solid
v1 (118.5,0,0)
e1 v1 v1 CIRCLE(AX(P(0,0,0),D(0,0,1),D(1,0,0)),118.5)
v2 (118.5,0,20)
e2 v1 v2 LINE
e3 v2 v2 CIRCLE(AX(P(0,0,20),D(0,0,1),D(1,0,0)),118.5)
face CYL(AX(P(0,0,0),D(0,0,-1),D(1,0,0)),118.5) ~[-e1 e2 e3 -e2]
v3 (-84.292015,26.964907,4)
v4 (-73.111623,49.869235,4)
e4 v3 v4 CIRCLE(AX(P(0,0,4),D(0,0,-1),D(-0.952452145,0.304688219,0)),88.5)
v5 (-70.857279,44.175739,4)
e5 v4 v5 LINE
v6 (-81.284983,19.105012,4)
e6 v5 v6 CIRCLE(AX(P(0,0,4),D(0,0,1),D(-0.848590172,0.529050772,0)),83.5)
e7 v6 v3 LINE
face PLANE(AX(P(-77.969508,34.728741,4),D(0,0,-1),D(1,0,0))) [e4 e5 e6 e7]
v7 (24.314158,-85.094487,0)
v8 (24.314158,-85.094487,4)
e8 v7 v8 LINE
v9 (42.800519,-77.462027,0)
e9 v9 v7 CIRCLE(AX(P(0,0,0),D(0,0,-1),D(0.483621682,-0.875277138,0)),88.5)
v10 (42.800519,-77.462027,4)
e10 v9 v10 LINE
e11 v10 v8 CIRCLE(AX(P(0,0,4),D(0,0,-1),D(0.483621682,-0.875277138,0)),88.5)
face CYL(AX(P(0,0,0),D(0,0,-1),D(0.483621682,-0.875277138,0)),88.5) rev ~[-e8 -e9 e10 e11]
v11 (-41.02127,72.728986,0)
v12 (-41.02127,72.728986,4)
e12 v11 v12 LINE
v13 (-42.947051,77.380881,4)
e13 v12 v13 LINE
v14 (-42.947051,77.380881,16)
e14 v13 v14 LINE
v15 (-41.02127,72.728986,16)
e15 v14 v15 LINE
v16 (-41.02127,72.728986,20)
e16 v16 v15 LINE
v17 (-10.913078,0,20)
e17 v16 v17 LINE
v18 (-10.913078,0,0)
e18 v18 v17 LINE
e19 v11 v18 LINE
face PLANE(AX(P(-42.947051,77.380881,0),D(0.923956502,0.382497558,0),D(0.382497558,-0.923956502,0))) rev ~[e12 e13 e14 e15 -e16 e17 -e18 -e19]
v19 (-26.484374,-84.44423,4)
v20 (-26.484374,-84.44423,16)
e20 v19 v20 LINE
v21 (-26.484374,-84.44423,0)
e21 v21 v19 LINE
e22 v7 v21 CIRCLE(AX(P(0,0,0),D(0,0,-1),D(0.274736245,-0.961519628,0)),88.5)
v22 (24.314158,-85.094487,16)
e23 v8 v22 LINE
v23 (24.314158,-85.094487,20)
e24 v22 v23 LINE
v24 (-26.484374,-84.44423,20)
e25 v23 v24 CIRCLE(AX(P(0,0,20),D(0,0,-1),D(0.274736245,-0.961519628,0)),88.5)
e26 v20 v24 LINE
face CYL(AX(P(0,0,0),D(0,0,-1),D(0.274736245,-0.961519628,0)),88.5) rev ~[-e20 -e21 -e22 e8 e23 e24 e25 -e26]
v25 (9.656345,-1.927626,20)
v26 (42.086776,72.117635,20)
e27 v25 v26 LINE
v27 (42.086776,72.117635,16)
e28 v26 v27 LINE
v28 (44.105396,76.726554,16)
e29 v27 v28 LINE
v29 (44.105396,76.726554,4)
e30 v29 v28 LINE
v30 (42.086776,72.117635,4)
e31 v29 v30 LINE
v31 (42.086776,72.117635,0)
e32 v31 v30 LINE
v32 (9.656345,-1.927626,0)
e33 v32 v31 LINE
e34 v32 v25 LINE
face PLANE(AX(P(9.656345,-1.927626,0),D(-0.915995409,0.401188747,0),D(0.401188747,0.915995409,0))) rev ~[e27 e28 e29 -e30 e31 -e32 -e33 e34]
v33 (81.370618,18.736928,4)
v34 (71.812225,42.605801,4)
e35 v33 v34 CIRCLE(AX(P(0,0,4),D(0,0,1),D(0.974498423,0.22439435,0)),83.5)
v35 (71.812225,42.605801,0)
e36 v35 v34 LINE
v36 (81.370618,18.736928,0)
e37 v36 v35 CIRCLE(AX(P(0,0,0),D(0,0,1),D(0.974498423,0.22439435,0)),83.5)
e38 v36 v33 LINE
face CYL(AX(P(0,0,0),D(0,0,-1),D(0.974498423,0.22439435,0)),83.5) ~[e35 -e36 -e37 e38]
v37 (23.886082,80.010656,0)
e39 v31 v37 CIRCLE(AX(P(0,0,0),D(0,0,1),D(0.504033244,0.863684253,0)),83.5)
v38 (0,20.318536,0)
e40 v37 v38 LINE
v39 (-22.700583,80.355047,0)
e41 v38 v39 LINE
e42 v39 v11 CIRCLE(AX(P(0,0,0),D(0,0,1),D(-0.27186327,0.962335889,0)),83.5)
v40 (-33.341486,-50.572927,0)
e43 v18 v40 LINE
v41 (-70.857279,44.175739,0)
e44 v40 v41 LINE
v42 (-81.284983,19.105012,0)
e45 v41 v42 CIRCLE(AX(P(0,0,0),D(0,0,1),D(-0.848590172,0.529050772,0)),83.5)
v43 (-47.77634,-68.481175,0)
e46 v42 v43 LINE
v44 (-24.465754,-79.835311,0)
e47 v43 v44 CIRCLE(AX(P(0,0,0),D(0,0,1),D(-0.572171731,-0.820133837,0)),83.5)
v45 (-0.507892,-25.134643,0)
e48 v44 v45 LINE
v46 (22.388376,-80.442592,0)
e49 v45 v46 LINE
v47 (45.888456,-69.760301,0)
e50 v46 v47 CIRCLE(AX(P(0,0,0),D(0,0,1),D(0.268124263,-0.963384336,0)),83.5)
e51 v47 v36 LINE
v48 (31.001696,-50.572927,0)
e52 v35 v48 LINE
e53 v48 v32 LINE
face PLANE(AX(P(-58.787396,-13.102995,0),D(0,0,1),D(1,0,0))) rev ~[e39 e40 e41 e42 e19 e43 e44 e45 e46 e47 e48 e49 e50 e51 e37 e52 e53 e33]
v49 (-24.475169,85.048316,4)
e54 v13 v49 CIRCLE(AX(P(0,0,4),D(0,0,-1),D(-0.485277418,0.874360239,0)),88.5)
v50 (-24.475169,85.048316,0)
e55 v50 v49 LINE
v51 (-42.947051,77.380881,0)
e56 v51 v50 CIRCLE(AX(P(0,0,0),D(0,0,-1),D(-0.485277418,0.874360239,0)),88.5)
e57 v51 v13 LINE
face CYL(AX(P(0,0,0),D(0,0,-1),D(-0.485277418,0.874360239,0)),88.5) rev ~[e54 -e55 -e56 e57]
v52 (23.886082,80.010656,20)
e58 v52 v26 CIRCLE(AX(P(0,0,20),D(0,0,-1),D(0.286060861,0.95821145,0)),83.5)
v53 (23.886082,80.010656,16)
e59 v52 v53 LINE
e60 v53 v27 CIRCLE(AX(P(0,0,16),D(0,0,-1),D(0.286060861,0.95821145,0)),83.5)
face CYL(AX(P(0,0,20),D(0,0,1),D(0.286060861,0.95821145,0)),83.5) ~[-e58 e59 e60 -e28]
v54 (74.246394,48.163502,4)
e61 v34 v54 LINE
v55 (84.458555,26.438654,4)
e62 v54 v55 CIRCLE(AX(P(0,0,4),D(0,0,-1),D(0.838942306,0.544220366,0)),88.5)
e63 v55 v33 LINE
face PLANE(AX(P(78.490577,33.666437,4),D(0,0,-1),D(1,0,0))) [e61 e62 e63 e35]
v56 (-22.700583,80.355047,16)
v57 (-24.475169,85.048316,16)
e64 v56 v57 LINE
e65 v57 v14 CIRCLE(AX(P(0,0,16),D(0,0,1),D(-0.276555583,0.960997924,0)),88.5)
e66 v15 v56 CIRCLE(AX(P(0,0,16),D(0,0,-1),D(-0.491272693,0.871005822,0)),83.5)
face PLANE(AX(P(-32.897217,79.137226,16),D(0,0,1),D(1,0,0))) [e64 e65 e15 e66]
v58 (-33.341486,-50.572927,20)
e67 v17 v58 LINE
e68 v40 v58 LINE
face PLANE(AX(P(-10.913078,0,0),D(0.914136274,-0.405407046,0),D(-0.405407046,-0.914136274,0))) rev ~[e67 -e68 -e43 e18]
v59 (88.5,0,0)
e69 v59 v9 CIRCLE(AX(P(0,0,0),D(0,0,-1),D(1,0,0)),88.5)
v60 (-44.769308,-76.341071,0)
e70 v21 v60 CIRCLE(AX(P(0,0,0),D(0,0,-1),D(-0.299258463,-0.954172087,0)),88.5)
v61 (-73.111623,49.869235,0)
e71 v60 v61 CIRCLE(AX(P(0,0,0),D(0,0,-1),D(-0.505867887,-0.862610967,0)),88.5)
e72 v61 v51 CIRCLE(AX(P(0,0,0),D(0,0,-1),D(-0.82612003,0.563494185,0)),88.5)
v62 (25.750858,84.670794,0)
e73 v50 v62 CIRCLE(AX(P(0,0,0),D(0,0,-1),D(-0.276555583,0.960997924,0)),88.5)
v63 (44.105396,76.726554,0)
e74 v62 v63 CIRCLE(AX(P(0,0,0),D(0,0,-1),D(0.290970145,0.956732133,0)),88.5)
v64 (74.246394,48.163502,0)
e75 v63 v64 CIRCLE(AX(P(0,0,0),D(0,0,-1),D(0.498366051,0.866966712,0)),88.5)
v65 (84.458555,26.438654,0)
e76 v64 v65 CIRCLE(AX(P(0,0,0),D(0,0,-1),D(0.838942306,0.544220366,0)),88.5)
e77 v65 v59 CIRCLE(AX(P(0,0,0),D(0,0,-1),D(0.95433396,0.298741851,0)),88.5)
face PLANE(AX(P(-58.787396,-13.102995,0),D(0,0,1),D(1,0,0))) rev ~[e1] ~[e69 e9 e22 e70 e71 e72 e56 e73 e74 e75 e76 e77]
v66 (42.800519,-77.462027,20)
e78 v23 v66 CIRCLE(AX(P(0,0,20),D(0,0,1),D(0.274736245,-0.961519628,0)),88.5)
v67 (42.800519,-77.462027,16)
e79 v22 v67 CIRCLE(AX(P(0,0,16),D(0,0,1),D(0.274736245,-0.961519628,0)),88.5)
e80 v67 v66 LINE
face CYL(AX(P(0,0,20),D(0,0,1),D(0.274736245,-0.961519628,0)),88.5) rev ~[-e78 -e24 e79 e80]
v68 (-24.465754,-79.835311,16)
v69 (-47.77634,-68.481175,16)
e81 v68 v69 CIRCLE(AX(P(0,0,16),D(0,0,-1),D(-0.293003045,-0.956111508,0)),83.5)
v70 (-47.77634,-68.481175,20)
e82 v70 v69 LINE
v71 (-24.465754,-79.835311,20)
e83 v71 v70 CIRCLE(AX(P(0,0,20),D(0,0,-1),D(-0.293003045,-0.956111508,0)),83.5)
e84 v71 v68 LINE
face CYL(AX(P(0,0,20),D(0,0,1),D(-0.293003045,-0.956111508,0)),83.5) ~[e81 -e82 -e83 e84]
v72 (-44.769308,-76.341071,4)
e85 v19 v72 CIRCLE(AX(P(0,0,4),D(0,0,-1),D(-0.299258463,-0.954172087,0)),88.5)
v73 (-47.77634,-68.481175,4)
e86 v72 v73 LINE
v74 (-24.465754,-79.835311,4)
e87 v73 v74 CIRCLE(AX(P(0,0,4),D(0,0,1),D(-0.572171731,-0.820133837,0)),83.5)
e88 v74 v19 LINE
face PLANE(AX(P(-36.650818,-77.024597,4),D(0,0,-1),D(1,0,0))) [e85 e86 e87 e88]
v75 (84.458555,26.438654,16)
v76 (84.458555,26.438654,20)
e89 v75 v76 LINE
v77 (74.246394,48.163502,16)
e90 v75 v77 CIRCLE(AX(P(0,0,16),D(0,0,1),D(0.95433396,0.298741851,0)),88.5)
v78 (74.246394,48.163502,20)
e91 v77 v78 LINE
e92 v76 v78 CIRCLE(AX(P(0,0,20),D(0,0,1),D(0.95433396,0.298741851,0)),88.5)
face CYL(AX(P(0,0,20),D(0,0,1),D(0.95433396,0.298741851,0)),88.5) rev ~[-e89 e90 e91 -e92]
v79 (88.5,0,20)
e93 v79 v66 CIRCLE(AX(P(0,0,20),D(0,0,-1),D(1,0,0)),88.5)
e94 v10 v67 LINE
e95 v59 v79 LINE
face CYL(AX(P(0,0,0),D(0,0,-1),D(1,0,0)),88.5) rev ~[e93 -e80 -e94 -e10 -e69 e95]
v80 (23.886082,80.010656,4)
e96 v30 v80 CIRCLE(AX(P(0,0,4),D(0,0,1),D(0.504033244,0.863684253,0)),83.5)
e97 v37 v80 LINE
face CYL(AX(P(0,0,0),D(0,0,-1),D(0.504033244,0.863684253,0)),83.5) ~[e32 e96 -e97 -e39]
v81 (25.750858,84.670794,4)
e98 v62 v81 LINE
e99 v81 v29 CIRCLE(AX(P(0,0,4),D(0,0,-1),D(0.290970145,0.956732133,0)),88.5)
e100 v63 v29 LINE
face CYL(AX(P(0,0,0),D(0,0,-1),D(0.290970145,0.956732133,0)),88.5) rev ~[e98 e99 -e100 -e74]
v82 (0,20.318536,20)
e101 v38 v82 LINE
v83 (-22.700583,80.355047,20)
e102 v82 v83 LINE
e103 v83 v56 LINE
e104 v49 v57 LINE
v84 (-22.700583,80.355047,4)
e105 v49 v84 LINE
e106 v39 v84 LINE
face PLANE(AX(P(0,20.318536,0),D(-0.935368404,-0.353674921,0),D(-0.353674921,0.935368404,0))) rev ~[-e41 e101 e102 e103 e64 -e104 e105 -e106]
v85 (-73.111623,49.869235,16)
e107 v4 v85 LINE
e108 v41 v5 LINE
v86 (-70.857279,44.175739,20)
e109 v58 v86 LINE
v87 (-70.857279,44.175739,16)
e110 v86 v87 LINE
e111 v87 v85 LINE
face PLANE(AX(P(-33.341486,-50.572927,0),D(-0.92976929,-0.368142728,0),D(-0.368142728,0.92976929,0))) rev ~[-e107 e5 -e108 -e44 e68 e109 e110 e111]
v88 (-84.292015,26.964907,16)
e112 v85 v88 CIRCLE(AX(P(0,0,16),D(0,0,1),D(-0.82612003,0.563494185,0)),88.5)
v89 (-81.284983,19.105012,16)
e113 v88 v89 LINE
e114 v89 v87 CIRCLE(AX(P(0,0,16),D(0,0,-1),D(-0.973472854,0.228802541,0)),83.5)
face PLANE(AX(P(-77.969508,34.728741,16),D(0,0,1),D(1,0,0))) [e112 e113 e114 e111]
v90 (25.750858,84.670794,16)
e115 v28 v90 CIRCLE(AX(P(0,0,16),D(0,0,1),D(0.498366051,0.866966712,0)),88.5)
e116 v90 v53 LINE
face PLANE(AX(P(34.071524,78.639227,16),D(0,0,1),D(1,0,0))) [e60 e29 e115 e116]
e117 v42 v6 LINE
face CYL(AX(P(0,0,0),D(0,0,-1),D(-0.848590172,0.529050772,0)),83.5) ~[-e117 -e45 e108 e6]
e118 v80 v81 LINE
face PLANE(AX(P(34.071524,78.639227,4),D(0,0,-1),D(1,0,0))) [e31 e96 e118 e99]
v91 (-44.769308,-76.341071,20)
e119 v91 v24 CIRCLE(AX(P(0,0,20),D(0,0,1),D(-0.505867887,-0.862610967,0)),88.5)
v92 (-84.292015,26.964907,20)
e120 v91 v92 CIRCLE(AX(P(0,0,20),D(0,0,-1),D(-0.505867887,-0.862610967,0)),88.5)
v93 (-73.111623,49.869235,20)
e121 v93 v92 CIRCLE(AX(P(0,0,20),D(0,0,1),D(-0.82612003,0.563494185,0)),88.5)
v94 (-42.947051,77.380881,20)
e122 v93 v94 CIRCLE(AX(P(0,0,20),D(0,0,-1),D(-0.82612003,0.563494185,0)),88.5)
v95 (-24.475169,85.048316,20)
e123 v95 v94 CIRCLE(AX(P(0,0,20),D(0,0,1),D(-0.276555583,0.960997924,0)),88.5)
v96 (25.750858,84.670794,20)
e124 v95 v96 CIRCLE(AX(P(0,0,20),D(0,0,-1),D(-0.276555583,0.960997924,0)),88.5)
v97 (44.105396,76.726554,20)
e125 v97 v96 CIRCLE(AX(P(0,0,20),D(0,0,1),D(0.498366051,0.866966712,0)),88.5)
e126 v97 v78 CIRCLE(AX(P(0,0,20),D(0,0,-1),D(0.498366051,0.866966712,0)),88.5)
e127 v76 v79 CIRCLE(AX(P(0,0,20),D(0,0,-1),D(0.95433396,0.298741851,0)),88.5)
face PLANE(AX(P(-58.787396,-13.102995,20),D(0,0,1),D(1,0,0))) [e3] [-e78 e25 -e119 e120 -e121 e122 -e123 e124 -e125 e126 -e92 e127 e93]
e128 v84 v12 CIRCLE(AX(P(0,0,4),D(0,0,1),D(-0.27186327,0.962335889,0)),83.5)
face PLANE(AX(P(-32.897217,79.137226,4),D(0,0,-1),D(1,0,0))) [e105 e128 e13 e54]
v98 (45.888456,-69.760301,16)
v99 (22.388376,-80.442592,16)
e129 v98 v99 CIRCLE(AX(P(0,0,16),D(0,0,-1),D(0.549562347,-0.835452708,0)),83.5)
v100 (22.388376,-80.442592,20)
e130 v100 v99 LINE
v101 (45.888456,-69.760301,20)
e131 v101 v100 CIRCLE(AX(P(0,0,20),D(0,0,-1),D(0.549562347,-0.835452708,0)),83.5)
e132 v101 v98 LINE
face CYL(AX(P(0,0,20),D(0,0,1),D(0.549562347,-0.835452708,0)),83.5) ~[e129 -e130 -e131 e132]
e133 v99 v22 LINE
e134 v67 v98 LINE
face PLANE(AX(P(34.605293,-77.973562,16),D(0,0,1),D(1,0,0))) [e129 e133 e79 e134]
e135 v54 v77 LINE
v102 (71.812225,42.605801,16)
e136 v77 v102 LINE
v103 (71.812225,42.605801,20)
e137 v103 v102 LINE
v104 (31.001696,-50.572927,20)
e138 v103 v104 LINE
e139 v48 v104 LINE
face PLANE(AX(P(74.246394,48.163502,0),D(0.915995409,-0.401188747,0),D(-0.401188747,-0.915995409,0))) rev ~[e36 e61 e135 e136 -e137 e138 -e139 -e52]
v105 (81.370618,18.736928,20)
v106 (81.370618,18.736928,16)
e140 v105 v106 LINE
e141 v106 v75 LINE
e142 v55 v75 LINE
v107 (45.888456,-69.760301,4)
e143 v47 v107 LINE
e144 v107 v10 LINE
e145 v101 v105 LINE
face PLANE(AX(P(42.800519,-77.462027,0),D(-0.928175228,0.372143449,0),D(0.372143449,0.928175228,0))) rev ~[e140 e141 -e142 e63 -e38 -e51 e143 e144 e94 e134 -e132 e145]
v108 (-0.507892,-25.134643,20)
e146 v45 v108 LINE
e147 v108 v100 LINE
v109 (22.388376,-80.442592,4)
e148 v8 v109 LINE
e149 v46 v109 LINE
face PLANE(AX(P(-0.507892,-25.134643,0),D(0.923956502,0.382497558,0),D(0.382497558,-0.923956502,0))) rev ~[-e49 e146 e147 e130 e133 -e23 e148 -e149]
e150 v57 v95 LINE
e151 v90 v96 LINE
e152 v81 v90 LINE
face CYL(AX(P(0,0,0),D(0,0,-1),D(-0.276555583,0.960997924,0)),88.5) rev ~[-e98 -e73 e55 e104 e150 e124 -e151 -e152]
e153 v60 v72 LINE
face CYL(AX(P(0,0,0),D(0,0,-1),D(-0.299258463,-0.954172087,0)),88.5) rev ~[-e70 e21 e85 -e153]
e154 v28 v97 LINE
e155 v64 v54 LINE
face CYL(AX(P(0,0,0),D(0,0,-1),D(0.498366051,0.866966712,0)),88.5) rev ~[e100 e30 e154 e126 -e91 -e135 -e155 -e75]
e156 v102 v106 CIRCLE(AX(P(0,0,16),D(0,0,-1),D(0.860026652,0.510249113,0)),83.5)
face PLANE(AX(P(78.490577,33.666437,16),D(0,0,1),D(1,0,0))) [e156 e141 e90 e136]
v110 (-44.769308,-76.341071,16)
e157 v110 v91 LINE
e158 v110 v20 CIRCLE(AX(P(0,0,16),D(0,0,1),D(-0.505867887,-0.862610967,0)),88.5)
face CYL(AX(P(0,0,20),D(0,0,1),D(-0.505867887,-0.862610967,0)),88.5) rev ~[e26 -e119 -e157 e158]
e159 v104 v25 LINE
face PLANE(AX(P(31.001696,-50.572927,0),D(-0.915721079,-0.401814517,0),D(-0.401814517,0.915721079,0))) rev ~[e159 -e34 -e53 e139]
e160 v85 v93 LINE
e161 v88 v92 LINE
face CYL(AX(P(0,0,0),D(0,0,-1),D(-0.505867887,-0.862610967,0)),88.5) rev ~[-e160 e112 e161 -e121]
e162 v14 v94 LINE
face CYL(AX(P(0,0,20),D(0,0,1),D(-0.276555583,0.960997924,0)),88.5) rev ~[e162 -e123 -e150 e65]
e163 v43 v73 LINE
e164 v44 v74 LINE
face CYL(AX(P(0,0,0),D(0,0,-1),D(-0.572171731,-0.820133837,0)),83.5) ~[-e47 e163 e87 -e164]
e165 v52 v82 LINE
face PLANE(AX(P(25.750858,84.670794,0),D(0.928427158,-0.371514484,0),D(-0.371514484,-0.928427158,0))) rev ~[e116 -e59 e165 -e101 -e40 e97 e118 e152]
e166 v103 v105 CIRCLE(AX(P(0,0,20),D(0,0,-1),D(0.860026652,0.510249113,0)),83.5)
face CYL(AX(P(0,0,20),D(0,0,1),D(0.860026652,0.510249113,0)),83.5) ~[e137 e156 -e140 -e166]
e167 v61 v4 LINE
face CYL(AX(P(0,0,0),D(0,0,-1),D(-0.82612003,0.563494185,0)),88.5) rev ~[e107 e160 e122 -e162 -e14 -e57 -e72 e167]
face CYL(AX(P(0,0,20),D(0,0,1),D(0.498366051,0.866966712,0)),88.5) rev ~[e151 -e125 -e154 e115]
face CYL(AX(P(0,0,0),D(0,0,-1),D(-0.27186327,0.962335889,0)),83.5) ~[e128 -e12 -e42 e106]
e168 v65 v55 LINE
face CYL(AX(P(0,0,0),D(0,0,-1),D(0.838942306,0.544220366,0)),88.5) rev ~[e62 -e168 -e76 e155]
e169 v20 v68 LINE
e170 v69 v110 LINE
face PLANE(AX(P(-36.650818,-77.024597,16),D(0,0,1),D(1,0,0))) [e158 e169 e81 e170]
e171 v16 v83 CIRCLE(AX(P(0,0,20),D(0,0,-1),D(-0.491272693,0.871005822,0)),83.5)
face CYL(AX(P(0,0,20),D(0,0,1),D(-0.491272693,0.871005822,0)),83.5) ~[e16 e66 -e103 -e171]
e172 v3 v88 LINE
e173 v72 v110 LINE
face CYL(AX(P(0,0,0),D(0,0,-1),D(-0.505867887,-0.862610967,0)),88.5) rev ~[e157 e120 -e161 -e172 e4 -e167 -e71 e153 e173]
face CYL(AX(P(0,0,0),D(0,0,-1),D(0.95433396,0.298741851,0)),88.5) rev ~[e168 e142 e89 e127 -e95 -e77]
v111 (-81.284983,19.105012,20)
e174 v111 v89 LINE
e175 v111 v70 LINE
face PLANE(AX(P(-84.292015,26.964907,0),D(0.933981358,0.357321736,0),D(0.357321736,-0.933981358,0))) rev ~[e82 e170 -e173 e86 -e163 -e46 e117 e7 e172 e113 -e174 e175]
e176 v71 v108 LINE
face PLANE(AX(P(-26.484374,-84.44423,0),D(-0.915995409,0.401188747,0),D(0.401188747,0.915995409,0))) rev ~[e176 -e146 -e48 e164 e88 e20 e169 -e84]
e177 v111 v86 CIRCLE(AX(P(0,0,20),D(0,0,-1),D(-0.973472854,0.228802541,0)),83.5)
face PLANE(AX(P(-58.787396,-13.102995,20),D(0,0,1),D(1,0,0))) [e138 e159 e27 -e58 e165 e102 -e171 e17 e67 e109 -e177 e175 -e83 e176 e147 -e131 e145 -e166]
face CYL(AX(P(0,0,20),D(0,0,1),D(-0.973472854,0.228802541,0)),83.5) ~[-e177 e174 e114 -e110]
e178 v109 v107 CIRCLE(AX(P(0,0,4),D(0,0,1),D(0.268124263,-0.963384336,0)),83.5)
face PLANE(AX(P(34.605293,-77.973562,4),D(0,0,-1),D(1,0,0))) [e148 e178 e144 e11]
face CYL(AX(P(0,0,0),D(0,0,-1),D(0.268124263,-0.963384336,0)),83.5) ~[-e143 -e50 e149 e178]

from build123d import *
from build123d import SkipClean  # not in build123d's __all__

# Parameters (mm, degrees)
F0_R     = 118.5
F1_DEPTH = 20
F2_DEPTH = 20
F4_DEPTH = 4
F6_DEPTH = 4


with BuildPart() as f1:
    # F0 (on Top) → F1 (new body)
    with BuildSketch(Plane.XY):
        Circle(F0_R)
        with BuildLine():
            ThreePointArc((84.4585554209, 26.4386538277), (87.4838046576, 13.3728801171), (88.5, 0))
            ThreePointArc((88.5, 0), (76.2236705877, -44.9689008331), (42.8005188217, -77.4620267524))
            ThreePointArc((42.8005188217, -77.4620267524), (33.7736370968, -81.8021481213), (24.3141576643, -85.0944871133))
            ThreePointArc((24.3141576643, -85.0944871133), (-1.1327702213, -88.4927501642), (-26.4843739752, -84.4442297327))
            ThreePointArc((-26.4843739752, -84.4442297327), (-35.8564791301, -80.9108330472), (-44.7693079971, -76.3410706072))
            ThreePointArc((-44.7693079971, -76.3410706072), (-82.6573501675, -31.6229736629), (-84.2920148647, 26.9649073806))
            ThreePointArc((-84.2920148647, 26.9649073806), (-79.5306754268, 38.821664907), (-73.1116226226, 49.869235381))
            ThreePointArc((-73.1116226226, 49.869235381), (-59.6374598942, 65.3882510652), (-42.9470514929, 77.3808811533))
            ThreePointArc((-42.9470514929, 77.3808811533), (-33.9284003129, 81.7380795726), (-24.4751691036, 85.0483162523))
            ThreePointArc((-24.4751691036, 85.0483162523), (0.6651888823, 88.4975000989), (25.7508578518, 84.6707937833))
            ThreePointArc((25.7508578518, 84.6707937833), (35.1532611727, 81.2188292758), (44.1053955412, 76.7265539703))
            ThreePointArc((44.1053955412, 76.7265539703), (60.8748593955, 64.2378509414), (74.2463940977, 48.1635024005))
            ThreePointArc((74.2463940977, 48.1635024005), (80.0924934797, 37.6489374113), (84.4585554209, 26.4386538277))
        make_face(mode=Mode.SUBTRACT)
    extrude(amount=F1_DEPTH)

    # F0 (on Top) → F2 (join)
    with BuildSketch(Plane.XY):
        with BuildLine():
            Line((-84.2920148647, 26.9649073806), (-44.7693079971, -76.3410706072))
            Line((-44.7693079971, -76.3410706072), (-33.3414858158, -50.5729274495))
            Line((-33.3414858158, -50.5729274495), (-73.1116226226, 49.869235381))
            ThreePointArc((-73.1116226226, 49.869235381), (-79.5306754268, 38.821664907), (-84.2920148647, 26.9649073806))
        make_face()
        with BuildLine():
            ThreePointArc((-44.7693079971, -76.3410706072), (-35.8564791301, -80.9108330472), (-26.4843739752, -84.4442297327))
            Line((-26.4843739752, -84.4442297327), (-0.5078915586, -25.1346434059))
            Line((-0.5078915586, -25.1346434059), (-10.9130780509, 0))
            Line((-10.9130780509, 0), (-33.3414858158, -50.5729274495))
            Line((-33.3414858158, -50.5729274495), (-44.7693079971, -76.3410706072))
        make_face()
        with BuildLine():
            Line((9.6563450565, -1.9276264085), (44.1053955412, 76.7265539703))
            ThreePointArc((44.1053955412, 76.7265539703), (35.1532611727, 81.2188292758), (25.7508578518, 84.6707937833))
            Line((25.7508578518, 84.6707937833), (0, 20.3185360879))
            Line((0, 20.3185360879), (-24.4751691036, 85.0483162523))
            ThreePointArc((-24.4751691036, 85.0483162523), (-33.9284003129, 81.7380795726), (-42.9470514929, 77.3808811533))
            Line((-42.9470514929, 77.3808811533), (-10.9130780509, 0))
            Line((-10.9130780509, 0), (-0.5078915586, -25.1346434059))
            Line((-0.5078915586, -25.1346434059), (9.6563450565, -1.9276264085))
        make_face()
        with BuildLine():
            ThreePointArc((24.3141576643, -85.0944871133), (33.7736370968, -81.8021481213), (42.8005188217, -77.4620267524))
            Line((42.8005188217, -77.4620267524), (31.0016963563, -50.5729274495))
            Line((31.0016963563, -50.5729274495), (9.6563450565, -1.9276264085))
            Line((9.6563450565, -1.9276264085), (-0.5078915586, -25.1346434059))
            Line((-0.5078915586, -25.1346434059), (24.3141576643, -85.0944871133))
        make_face()
        with BuildLine():
            Line((42.8005188217, -77.4620267524), (84.4585554209, 26.4386538277))
            ThreePointArc((84.4585554209, 26.4386538277), (80.0924934797, 37.6489374113), (74.2463940977, 48.1635024005))
            Line((74.2463940977, 48.1635024005), (31.0016963563, -50.5729274495))
            Line((31.0016963563, -50.5729274495), (42.8005188217, -77.4620267524))
        make_face()
    extrude(amount=F2_DEPTH)

    # F3 (on face) → F4 (cut)
    with BuildSketch(Plane.XY.offset(20)):
        with BuildLine():
            ThreePointArc((24.3141576643, -85.0944871133), (33.7736370968, -81.8021481213), (42.8005188217, -77.4620267524))
            Line((42.8005188217, -77.4620267524), (45.8884559448, -69.7603011103))
            ThreePointArc((45.8884559448, -69.7603011103), (34.5537158667, -76.0150690311), (22.3883760006, -80.4425920769))
            Line((22.3883760006, -80.4425920769), (24.3141576643, -85.0944871133))
        make_face()
        with BuildLine():
            ThreePointArc((-44.7693079971, -76.3410706072), (-35.8564791301, -80.9108330472), (-26.4843739752, -84.4442297327))
            Line((-26.4843739752, -84.4442297327), (-24.4657542833, -79.8353109053))
            ThreePointArc((-24.4657542833, -79.8353109053), (-36.5644517119, -75.068574457), (-47.7763395541, -68.4811753609))
            Line((-47.7763395541, -68.4811753609), (-44.7693079971, -76.3410706072))
        make_face()
        with BuildLine():
            ThreePointArc((-73.1116226226, 49.869235381), (-79.5306754268, 38.821664907), (-84.2920148647, 26.9649073806))
            Line((-84.2920148647, 26.9649073806), (-81.2849833078, 19.1050121343))
            ThreePointArc((-81.2849833078, 19.1050121343), (-77.0970321509, 32.067080215), (-70.8572793817, 44.1757394803))
            Line((-70.8572793817, 44.1757394803), (-73.1116226226, 49.869235381))
        make_face()
        with BuildLine():
            Line((-22.7005830367, 80.3550466977), (-24.4751691036, 85.0483162523))
            ThreePointArc((-24.4751691036, 85.0483162523), (-33.9284003129, 81.7380795726), (-42.9470514929, 77.3808811533))
            Line((-42.9470514929, 77.3808811533), (-41.0212698292, 72.728986117))
            ThreePointArc((-41.0212698292, 72.728986117), (-32.0882818667, 77.0882102973), (-22.7005830367, 80.3550466977))
        make_face()
        with BuildLine():
            Line((42.0867758493, 72.117635143), (44.1053955412, 76.7265539703))
            ThreePointArc((44.1053955412, 76.7265539703), (35.1532611727, 81.2188292758), (25.7508578518, 84.6707937833))
            Line((25.7508578518, 84.6707937833), (23.8860818979, 80.0106561126))
            ThreePointArc((23.8860818979, 80.0106561126), (33.2216711626, 76.6065960943), (42.0867758493, 72.117635143))
        make_face()
        with BuildLine():
            Line((81.3706182978, 18.7369281856), (84.4585554209, 26.4386538277))
            ThreePointArc((84.4585554209, 26.4386538277), (80.0924934797, 37.6489374113), (74.2463940977, 48.1635024005))
            Line((74.2463940977, 48.1635024005), (71.8122254689, 42.6058009338))
            ThreePointArc((71.8122254689, 42.6058009338), (77.515654404, 31.0414774507), (81.3706182978, 18.7369281856))
        make_face()
    with SkipClean():  # cleaning this boolean's faces spoils the solid; the shape is the same uncleaned
        extrude(amount=-F4_DEPTH, mode=Mode.SUBTRACT)

    # F5 (on face) → F6 (cut)
    with BuildSketch(Plane(origin=(0, 0, 0), x_dir=(1, 0, 0), z_dir=(0, 0, -1))):
        with BuildLine():
            Line((-24.4657542833, 79.8353109053), (-26.4843739752, 84.4442297327))
            ThreePointArc((-26.4843739752, 84.4442297327), (-35.8564791301, 80.9108330472), (-44.7693079971, 76.3410706072))
            Line((-44.7693079971, 76.3410706072), (-47.7763395541, 68.4811753609))
            ThreePointArc((-47.7763395541, 68.4811753609), (-36.5644517119, 75.068574457), (-24.4657542833, 79.8353109053))
        make_face()
        with BuildLine():
            Line((45.8884559448, 69.7603011104), (42.8005188217, 77.4620267524))
            ThreePointArc((42.8005188217, 77.4620267524), (33.7736370968, 81.8021481213), (24.3141576643, 85.0944871133))
            Line((24.3141576643, 85.0944871133), (22.3883760006, 80.4425920769))
            ThreePointArc((22.3883760006, 80.4425920769), (34.5537158667, 76.0150690311), (45.8884559448, 69.7603011103))
        make_face()
        with BuildLine():
            ThreePointArc((74.2463940977, -48.1635024005), (80.0924934797, -37.6489374113), (84.4585554209, -26.4386538277))
            Line((84.4585554209, -26.4386538277), (81.3706182978, -18.7369281856))
            ThreePointArc((81.3706182978, -18.7369281856), (77.515654404, -31.0414774507), (71.8122254689, -42.6058009338))
            Line((71.8122254689, -42.6058009338), (74.2463940977, -48.1635024005))
        make_face()
        with BuildLine():
            ThreePointArc((25.7508578518, -84.6707937833), (35.1532611727, -81.2188292758), (44.1053955412, -76.7265539703))
            Line((44.1053955412, -76.7265539703), (42.0867758493, -72.117635143))
            ThreePointArc((42.0867758493, -72.117635143), (33.2216711626, -76.6065960943), (23.8860818979, -80.0106561126))
            Line((23.8860818979, -80.0106561126), (25.7508578518, -84.6707937833))
        make_face()
        with BuildLine():
            ThreePointArc((-42.9470514929, -77.3808811533), (-33.9284003129, -81.7380795726), (-24.4751691036, -85.0483162523))
            Line((-24.4751691036, -85.0483162523), (-22.7005830367, -80.3550466977))
            ThreePointArc((-22.7005830367, -80.3550466977), (-32.0882818667, -77.0882102973), (-41.0212698292, -72.728986117))
            Line((-41.0212698292, -72.728986117), (-42.9470514929, -77.3808811533))
        make_face()
        with BuildLine():
            Line((-81.2849833078, -19.1050121343), (-84.2920148647, -26.9649073806))
            ThreePointArc((-84.2920148647, -26.9649073806), (-79.5306754268, -38.821664907), (-73.1116226226, -49.869235381))
            Line((-73.1116226226, -49.869235381), (-70.8572793817, -44.1757394803))
            ThreePointArc((-70.8572793817, -44.1757394803), (-77.0970321509, -32.067080215), (-81.2849833078, -19.1050121343))
        make_face()
    extrude(amount=-F6_DEPTH, mode=Mode.SUBTRACT)


solid = f1.part
